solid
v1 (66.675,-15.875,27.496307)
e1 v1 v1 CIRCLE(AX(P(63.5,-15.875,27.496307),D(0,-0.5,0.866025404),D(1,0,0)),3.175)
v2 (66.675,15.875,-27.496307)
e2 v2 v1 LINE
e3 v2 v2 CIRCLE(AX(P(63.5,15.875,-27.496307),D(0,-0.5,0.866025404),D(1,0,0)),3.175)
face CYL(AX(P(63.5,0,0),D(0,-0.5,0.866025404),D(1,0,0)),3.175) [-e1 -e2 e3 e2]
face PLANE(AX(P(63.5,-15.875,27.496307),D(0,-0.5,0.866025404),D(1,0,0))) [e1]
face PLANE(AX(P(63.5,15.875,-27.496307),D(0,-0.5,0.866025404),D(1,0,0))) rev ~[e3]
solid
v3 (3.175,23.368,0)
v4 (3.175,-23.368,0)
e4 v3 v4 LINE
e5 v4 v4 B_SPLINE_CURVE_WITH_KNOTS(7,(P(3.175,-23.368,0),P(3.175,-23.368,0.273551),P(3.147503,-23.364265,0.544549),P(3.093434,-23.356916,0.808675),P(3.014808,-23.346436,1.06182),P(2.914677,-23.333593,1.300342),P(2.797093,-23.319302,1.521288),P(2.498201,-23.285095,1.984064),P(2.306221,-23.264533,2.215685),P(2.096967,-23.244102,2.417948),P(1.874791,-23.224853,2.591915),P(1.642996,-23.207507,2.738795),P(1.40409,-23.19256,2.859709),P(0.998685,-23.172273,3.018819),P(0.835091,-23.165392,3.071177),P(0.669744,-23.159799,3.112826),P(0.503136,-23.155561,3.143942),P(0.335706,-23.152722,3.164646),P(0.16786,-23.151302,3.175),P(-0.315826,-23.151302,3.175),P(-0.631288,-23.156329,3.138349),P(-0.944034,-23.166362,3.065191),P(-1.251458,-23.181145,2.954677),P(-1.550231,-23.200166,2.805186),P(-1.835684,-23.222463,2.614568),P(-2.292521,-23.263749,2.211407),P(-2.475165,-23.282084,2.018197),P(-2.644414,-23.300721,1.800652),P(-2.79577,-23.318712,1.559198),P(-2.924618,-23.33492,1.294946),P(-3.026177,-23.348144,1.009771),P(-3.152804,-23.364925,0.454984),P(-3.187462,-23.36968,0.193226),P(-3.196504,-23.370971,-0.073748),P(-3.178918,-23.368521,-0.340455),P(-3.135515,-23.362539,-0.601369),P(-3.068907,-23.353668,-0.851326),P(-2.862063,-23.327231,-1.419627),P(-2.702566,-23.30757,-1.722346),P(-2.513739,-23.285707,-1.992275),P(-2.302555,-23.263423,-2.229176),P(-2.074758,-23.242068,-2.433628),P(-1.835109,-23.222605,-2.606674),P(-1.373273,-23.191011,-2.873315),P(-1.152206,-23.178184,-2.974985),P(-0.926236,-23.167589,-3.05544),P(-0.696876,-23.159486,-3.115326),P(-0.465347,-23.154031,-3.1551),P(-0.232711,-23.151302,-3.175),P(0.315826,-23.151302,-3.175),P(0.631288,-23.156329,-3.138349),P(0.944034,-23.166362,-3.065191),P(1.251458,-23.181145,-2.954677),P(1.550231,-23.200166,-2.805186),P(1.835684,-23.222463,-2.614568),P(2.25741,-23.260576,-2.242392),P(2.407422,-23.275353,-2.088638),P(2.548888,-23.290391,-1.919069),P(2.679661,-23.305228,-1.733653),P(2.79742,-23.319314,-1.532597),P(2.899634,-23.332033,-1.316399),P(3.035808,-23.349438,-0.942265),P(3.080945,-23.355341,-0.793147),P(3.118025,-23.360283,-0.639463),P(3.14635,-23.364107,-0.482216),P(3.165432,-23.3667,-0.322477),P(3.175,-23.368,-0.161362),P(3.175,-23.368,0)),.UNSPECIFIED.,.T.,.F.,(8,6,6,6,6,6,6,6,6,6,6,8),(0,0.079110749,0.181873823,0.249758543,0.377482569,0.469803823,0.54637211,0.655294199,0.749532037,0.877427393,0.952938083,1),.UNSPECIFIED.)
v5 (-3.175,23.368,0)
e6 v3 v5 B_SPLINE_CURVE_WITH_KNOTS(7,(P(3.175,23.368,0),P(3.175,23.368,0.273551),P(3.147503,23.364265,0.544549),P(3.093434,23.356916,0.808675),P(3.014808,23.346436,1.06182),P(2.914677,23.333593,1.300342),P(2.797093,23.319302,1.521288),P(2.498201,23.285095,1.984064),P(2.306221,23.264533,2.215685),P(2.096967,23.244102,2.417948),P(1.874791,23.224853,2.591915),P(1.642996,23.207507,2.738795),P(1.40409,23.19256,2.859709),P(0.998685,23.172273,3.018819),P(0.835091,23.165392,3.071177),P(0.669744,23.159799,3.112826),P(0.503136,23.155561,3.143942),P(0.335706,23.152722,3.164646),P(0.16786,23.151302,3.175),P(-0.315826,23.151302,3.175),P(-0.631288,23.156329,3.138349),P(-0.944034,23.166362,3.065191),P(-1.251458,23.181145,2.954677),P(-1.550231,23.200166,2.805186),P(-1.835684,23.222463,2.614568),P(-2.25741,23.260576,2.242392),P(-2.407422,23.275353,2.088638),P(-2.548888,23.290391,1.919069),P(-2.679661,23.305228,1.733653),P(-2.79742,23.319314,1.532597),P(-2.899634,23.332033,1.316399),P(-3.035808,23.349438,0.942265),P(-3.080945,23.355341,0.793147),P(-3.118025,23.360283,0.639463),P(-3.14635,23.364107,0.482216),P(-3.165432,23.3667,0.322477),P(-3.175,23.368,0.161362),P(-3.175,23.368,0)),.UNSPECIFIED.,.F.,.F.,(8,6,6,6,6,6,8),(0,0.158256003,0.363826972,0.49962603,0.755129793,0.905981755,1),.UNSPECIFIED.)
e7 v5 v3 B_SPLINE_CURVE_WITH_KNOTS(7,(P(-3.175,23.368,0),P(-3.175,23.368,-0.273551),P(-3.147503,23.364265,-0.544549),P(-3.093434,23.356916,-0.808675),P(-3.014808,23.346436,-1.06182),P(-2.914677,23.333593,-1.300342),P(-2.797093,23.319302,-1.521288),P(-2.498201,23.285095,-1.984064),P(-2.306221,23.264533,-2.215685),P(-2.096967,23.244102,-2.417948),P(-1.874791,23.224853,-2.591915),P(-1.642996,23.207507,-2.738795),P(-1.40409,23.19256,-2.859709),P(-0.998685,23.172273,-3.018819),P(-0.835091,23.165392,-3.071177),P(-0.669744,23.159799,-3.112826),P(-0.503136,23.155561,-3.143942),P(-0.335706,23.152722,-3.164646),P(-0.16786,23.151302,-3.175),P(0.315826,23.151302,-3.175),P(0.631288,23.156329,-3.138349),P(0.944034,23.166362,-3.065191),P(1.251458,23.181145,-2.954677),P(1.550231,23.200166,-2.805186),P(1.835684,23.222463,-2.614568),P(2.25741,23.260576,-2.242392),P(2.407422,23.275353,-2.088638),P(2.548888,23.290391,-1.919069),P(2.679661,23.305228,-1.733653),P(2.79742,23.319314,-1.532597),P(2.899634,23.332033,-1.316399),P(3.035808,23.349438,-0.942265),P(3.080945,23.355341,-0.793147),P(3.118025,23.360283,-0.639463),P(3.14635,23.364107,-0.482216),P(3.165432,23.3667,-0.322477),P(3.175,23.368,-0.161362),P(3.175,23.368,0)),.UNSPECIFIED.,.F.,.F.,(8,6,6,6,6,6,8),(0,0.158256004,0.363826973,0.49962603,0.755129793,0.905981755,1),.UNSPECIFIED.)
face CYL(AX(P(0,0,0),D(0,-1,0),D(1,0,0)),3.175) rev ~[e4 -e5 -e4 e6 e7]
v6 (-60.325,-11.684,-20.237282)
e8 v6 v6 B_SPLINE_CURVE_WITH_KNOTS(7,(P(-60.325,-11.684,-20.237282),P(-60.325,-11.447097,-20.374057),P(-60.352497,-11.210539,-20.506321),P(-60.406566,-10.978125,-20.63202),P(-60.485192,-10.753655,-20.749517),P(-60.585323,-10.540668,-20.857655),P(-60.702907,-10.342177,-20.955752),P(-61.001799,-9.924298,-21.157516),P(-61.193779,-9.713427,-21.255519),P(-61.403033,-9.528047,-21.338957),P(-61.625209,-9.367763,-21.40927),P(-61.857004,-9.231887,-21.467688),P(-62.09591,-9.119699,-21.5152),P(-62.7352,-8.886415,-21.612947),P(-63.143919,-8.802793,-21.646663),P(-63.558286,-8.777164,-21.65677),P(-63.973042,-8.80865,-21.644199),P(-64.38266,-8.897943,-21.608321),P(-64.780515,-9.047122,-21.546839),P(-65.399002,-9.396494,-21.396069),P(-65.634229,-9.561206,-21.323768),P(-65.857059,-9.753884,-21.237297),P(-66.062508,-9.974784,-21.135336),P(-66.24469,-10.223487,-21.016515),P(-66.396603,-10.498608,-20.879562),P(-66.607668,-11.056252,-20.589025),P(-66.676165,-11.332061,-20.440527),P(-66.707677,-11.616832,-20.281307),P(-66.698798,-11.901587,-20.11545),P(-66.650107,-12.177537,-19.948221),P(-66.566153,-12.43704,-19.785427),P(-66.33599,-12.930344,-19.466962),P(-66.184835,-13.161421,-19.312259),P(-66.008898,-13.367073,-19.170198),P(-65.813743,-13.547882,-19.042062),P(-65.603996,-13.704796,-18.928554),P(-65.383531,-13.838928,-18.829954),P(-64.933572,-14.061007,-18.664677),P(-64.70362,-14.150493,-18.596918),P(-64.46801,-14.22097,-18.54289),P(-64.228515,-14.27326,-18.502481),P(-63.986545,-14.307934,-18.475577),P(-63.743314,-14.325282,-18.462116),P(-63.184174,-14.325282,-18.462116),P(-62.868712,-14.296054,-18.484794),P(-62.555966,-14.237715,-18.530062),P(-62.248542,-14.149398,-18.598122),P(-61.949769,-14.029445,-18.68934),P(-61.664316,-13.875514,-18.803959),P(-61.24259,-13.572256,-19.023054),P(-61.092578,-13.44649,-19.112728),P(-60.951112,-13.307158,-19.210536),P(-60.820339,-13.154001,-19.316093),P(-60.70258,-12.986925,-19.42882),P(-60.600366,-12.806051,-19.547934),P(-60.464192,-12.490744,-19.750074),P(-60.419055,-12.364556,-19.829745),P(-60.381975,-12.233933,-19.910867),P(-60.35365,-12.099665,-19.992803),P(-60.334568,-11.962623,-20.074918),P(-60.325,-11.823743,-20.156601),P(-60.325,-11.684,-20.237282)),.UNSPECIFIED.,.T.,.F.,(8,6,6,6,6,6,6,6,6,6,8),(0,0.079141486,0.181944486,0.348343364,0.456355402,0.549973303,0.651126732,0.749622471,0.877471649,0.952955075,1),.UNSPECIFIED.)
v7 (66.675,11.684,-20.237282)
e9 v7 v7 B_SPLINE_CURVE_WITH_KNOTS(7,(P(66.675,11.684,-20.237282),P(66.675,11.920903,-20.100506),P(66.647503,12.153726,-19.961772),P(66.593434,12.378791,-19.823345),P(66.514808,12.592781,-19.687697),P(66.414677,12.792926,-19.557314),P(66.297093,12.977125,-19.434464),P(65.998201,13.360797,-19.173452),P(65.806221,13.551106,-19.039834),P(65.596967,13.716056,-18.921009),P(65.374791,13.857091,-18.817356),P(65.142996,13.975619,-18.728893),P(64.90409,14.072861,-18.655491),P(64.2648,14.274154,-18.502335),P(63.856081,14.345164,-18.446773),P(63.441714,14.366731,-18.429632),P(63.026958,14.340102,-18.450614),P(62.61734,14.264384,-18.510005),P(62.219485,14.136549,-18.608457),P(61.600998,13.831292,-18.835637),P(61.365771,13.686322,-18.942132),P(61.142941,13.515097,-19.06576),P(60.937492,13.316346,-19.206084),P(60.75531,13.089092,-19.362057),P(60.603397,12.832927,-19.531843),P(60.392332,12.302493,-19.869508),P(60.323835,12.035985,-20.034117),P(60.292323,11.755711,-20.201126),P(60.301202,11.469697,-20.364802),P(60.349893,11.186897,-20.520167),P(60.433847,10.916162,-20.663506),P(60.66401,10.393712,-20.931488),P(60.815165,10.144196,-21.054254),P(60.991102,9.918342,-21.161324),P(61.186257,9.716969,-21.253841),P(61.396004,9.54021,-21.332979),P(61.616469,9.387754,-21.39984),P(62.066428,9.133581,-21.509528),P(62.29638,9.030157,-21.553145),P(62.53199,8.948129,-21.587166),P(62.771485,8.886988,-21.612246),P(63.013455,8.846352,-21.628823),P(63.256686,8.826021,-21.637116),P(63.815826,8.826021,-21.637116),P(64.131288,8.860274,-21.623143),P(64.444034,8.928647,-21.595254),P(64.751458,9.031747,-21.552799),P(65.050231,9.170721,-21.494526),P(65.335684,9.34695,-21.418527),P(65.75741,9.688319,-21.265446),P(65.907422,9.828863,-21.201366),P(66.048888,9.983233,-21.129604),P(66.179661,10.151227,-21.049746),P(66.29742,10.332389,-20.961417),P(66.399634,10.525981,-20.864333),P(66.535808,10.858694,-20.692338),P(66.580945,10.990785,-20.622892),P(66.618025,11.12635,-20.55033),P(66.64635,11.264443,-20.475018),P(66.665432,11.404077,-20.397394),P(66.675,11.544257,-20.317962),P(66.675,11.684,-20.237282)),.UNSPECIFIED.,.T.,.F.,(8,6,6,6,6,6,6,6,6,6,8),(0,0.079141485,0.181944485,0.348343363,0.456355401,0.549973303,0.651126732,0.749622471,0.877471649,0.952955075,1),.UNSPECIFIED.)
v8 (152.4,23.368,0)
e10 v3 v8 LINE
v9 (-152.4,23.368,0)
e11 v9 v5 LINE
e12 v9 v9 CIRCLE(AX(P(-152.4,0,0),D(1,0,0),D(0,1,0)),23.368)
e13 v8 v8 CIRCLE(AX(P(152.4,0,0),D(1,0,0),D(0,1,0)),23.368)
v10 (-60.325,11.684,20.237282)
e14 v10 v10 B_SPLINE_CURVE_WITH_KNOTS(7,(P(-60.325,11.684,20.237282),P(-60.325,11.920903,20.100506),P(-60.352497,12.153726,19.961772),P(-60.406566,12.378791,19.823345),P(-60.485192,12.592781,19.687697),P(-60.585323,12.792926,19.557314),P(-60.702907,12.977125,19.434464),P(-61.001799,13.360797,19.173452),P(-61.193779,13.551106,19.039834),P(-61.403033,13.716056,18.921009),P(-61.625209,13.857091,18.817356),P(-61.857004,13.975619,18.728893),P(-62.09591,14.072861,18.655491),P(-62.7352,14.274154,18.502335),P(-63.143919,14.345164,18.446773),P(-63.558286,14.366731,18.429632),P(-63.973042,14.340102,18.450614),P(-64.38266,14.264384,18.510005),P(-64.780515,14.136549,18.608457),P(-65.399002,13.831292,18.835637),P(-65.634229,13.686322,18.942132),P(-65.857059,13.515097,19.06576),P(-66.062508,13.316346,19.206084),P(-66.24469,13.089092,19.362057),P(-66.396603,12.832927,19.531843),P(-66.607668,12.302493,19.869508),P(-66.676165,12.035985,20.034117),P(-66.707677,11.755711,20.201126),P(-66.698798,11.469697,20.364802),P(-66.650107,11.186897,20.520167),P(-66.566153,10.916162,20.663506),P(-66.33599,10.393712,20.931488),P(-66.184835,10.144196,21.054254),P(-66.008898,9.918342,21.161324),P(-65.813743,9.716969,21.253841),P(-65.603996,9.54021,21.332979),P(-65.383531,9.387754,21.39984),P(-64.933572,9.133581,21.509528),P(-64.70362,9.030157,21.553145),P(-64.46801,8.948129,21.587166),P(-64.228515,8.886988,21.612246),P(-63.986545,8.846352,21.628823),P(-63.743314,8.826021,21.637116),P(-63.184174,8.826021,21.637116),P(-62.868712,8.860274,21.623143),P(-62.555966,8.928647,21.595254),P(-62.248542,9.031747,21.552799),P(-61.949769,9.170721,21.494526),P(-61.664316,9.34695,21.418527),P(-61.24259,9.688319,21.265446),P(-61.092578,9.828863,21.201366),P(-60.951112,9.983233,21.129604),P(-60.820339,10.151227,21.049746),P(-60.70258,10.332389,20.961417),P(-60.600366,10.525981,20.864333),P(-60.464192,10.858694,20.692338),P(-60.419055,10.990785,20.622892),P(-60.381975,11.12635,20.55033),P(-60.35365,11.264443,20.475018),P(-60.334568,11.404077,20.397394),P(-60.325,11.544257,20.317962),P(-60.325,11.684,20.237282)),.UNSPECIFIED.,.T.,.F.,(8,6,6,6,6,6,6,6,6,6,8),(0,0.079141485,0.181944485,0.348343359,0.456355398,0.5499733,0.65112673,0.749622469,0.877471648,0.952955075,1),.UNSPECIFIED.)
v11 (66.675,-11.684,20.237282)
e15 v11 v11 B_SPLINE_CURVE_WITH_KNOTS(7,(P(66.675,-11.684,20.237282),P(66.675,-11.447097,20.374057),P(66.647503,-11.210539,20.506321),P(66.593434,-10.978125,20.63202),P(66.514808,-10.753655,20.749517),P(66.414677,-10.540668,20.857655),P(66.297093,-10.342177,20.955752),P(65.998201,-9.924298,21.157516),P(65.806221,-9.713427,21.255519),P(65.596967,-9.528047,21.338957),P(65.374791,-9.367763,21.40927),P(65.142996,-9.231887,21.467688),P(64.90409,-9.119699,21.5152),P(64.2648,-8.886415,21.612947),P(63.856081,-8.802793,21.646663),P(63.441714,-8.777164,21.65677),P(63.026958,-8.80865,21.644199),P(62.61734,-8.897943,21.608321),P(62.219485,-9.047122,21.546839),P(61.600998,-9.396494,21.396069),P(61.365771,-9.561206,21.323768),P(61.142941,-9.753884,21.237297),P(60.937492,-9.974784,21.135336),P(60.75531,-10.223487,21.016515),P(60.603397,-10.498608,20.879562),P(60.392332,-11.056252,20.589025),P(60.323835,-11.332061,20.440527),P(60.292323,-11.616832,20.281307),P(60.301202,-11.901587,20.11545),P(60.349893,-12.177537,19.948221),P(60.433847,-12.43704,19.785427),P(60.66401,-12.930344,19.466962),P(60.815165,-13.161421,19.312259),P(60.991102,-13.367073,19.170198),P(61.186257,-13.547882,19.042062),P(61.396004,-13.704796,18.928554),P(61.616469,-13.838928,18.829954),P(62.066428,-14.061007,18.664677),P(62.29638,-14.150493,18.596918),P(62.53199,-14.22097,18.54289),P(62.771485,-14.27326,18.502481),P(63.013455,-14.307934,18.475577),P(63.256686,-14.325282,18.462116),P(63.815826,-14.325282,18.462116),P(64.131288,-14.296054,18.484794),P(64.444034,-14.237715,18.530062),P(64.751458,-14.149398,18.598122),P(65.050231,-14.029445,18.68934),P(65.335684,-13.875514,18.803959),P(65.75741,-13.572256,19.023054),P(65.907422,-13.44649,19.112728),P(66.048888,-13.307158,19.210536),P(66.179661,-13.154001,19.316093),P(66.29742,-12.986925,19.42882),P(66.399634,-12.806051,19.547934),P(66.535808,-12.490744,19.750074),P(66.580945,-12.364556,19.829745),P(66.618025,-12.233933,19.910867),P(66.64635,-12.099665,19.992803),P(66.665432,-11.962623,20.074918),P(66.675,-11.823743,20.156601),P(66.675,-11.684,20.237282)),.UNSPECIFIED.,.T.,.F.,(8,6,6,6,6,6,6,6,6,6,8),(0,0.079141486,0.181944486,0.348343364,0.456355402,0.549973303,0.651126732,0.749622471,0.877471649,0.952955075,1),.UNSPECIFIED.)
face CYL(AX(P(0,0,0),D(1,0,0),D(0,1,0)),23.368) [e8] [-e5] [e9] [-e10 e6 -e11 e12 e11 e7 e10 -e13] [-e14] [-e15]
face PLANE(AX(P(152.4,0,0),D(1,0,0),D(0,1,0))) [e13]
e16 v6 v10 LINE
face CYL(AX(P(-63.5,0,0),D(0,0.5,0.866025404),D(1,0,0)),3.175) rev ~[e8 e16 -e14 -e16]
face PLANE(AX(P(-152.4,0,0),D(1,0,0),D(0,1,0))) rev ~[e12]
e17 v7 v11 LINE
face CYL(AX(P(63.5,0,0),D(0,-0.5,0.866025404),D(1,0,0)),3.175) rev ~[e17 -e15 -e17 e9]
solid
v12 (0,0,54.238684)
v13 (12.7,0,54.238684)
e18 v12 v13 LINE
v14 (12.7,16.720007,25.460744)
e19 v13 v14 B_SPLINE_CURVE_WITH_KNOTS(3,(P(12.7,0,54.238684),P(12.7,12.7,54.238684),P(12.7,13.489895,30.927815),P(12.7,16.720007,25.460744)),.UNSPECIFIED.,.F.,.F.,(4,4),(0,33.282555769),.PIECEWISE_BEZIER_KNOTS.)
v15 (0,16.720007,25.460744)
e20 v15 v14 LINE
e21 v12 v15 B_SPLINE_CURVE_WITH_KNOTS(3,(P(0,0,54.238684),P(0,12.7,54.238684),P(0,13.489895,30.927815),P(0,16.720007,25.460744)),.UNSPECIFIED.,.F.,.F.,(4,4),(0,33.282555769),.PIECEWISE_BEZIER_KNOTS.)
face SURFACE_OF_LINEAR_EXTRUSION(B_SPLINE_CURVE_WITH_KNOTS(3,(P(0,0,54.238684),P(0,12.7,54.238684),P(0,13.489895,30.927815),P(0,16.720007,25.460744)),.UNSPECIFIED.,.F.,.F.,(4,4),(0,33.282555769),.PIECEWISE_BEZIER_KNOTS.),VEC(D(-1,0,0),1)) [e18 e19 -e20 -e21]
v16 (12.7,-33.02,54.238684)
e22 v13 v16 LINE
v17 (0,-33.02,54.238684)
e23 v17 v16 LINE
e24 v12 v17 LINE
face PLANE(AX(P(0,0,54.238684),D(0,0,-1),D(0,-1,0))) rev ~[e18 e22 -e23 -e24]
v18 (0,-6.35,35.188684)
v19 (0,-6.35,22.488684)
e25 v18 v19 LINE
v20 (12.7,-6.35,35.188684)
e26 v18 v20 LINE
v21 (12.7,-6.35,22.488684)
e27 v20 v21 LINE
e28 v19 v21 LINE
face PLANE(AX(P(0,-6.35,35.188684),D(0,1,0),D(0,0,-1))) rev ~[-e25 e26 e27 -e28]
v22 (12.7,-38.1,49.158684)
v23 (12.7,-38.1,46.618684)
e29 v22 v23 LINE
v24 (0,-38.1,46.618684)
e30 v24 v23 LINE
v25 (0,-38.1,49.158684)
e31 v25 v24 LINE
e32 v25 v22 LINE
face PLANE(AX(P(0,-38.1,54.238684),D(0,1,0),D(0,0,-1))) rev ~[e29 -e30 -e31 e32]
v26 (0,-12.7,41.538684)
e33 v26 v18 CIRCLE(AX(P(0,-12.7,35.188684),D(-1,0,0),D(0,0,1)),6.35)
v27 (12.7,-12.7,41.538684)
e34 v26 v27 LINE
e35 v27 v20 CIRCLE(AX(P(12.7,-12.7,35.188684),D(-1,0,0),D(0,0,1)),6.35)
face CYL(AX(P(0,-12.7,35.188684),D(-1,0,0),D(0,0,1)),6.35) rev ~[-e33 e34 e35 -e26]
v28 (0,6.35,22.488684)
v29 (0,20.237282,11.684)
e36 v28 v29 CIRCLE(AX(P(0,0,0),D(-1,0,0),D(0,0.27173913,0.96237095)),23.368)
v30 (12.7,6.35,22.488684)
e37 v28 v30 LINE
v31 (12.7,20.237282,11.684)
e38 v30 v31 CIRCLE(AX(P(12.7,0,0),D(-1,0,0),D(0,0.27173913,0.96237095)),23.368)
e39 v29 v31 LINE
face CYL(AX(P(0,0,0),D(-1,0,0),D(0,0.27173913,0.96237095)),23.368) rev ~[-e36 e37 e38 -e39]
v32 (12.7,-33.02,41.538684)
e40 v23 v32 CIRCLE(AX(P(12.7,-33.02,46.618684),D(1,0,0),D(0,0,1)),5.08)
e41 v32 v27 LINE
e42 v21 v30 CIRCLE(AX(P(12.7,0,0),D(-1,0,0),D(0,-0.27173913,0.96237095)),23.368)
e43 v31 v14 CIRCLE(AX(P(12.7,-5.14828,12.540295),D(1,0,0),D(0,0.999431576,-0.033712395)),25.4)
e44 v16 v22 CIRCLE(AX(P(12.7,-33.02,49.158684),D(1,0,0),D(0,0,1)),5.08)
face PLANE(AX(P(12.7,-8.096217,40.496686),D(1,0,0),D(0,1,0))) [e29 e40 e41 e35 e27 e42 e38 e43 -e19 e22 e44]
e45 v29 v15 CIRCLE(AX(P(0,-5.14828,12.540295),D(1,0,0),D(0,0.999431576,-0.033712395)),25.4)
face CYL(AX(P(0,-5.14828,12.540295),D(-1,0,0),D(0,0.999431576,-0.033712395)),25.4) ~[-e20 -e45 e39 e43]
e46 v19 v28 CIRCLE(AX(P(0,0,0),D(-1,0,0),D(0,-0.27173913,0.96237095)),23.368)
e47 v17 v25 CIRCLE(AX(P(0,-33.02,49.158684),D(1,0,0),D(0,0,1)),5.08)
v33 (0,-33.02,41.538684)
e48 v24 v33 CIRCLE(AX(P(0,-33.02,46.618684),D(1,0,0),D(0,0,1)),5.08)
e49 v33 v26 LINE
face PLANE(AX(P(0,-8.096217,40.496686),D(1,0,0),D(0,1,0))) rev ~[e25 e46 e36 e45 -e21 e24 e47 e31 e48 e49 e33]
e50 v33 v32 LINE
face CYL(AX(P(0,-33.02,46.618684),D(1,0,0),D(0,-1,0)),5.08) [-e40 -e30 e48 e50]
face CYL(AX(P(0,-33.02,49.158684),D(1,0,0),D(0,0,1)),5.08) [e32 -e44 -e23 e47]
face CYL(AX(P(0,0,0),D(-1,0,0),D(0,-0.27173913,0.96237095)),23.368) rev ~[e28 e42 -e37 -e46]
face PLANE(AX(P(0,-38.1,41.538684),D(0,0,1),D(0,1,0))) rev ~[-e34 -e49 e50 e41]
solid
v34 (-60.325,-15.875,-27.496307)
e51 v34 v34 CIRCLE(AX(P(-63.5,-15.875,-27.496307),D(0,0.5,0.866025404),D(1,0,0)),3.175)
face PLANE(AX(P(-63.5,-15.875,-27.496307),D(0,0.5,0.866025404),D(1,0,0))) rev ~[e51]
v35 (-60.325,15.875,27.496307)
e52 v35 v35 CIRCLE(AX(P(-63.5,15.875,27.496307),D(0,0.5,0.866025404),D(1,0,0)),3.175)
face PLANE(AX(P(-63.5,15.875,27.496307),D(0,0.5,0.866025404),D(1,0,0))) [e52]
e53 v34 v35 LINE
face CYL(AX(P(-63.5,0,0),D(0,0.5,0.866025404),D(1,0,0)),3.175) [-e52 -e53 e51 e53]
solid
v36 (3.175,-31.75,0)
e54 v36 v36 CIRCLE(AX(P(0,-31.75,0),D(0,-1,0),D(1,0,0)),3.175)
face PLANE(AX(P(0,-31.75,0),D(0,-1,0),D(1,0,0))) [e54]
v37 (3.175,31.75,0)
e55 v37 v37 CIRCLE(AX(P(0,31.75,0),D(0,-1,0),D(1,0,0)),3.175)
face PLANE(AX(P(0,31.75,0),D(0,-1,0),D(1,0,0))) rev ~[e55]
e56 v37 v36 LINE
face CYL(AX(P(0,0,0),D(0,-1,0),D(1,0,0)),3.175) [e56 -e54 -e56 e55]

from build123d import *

# Parameters (mm, degrees)
F1_R      = 23.368
F4_DEPTH  = 152.4
F5_R      = 3.175
F8_DEPTH  = 25.4
F7_R      = 3.175
F9_DEPTH  = 25.4
F6_R      = 3.175
F10_DEPTH = 25.4
F11_DEPTH = 31.75
F12_DEPTH = 31.75
F13_DEPTH = 31.75
F15_DEPTH = 12.7
F16_R     = 5.08


# Not quite as in the source:
# - a variable given as a bare number and used for a length is read in inches; the dataset says mm whatever the document's units were


with BuildPart() as f4:
    # F1 (on Right) → F4 (new body, symmetric)
    with BuildSketch(Plane.YZ):
        Circle(F1_R)
    extrude(amount=F4_DEPTH, both=True)

    # F5 (on Front) → F8 (cut, symmetric)
    with BuildSketch(Plane.XZ):
        Circle(F5_R)
    extrude(amount=F8_DEPTH, both=True, mode=Mode.SUBTRACT)

    # F7 (on face) → F9 (cut, symmetric)
    with BuildSketch(Plane(origin=(0, 0, 0), x_dir=(1, 0, 0), z_dir=(0, -0.5, 0.8660254038))):
        with Locations((63.5, 0)):
            Circle(F7_R)
    extrude(amount=F9_DEPTH, both=True, mode=Mode.SUBTRACT)

    # F6 (on face) → F10 (cut, symmetric)
    with BuildSketch(Plane(origin=(0, 0, 0), x_dir=(1, 0, 0), z_dir=(0, 0.5, 0.8660254038))):
        with Locations((-63.5, 0)):
            Circle(F6_R)
    extrude(amount=F10_DEPTH, both=True, mode=Mode.SUBTRACT)


with BuildPart() as f11:
    # F6 (on face) → F11 (new body, symmetric)
    with BuildSketch(Plane(origin=(0, 0, 0), x_dir=(1, 0, 0), z_dir=(0, 0.5, 0.8660254038))):
        with Locations((-63.5, 0)):
            Circle(F6_R)
    extrude(amount=F11_DEPTH, both=True)


with BuildPart() as f12:
    # F5 (on Front) → F12 (new body, symmetric)
    with BuildSketch(Plane.XZ):
        Circle(F5_R)
    extrude(amount=F12_DEPTH, both=True)


with BuildPart() as f13:
    # F7 (on face) → F13 (new body, symmetric)
    with BuildSketch(Plane(origin=(0, 0, 0), x_dir=(1, 0, 0), z_dir=(0, -0.5, 0.8660254038))):
        with Locations((63.5, 0)):
            Circle(F7_R)
    extrude(amount=F13_DEPTH, both=True)


with BuildPart() as f15:
    # F14 (on Right) → F15 (new body)
    with BuildSketch(Plane.YZ):
        with BuildLine():
            Line((-6.35, 35.1886843546), (-6.35, 22.4886843546))
            ThreePointArc((-6.35, 22.4886843546), (0, 23.368), (6.35, 22.4886843546))
            Line((6.35, 22.4886843546), (6.35, 35.1886843546))
            ThreePointArc((6.35, 35.1886843546), (12.2295840817, 31.0651383233), (16.7200072547, 25.460743568))
            add(Edge.make_bspline(
                [(0, 54.2386843546), (12.7, 54.2386843546), (13.4898950697, 30.9278154783), (16.7200072547, 25.460743568)],
                knots=[0, 0, 0, 0, 33.2825557689, 33.2825557689, 33.2825557689, 33.2825557689], degree=3))
            Line((0, 54.2386843546), (-38.1, 54.2386843546))
            Line((-38.1, 54.2386843546), (-38.1, 41.5386843546))
            Line((-38.1, 41.5386843546), (-12.7, 41.5386843546))
            ThreePointArc((-12.7, 41.5386843546), (-8.2098719395, 39.6788124151), (-6.35, 35.1886843546))
        make_face()
        with BuildLine():
            ThreePointArc((6.35, 22.4886843546), (14.3494315983, 18.4433521033), (20.2372816356, 11.684))
            ThreePointArc((20.2372816356, 11.684), (19.4623116998, 18.823507157), (16.7200072547, 25.460743568))
            ThreePointArc((16.7200072547, 25.460743568), (12.2295840817, 31.0651383233), (6.35, 35.1886843546))
            Line((6.35, 35.1886843546), (6.35, 22.4886843546))
        make_face()
    extrude(amount=F15_DEPTH)

    # F16
    f16_edges = [f15.edges().sort_by_distance(p)[0] for p in [
        (6.35, -38.1, 54.238684),
        (6.35, -38.1, 41.538684),
    ]]
    fillet(f16_edges, radius=F16_R)


solid = Compound([f4.part, f11.part, f12.part, f13.part, f15.part])
